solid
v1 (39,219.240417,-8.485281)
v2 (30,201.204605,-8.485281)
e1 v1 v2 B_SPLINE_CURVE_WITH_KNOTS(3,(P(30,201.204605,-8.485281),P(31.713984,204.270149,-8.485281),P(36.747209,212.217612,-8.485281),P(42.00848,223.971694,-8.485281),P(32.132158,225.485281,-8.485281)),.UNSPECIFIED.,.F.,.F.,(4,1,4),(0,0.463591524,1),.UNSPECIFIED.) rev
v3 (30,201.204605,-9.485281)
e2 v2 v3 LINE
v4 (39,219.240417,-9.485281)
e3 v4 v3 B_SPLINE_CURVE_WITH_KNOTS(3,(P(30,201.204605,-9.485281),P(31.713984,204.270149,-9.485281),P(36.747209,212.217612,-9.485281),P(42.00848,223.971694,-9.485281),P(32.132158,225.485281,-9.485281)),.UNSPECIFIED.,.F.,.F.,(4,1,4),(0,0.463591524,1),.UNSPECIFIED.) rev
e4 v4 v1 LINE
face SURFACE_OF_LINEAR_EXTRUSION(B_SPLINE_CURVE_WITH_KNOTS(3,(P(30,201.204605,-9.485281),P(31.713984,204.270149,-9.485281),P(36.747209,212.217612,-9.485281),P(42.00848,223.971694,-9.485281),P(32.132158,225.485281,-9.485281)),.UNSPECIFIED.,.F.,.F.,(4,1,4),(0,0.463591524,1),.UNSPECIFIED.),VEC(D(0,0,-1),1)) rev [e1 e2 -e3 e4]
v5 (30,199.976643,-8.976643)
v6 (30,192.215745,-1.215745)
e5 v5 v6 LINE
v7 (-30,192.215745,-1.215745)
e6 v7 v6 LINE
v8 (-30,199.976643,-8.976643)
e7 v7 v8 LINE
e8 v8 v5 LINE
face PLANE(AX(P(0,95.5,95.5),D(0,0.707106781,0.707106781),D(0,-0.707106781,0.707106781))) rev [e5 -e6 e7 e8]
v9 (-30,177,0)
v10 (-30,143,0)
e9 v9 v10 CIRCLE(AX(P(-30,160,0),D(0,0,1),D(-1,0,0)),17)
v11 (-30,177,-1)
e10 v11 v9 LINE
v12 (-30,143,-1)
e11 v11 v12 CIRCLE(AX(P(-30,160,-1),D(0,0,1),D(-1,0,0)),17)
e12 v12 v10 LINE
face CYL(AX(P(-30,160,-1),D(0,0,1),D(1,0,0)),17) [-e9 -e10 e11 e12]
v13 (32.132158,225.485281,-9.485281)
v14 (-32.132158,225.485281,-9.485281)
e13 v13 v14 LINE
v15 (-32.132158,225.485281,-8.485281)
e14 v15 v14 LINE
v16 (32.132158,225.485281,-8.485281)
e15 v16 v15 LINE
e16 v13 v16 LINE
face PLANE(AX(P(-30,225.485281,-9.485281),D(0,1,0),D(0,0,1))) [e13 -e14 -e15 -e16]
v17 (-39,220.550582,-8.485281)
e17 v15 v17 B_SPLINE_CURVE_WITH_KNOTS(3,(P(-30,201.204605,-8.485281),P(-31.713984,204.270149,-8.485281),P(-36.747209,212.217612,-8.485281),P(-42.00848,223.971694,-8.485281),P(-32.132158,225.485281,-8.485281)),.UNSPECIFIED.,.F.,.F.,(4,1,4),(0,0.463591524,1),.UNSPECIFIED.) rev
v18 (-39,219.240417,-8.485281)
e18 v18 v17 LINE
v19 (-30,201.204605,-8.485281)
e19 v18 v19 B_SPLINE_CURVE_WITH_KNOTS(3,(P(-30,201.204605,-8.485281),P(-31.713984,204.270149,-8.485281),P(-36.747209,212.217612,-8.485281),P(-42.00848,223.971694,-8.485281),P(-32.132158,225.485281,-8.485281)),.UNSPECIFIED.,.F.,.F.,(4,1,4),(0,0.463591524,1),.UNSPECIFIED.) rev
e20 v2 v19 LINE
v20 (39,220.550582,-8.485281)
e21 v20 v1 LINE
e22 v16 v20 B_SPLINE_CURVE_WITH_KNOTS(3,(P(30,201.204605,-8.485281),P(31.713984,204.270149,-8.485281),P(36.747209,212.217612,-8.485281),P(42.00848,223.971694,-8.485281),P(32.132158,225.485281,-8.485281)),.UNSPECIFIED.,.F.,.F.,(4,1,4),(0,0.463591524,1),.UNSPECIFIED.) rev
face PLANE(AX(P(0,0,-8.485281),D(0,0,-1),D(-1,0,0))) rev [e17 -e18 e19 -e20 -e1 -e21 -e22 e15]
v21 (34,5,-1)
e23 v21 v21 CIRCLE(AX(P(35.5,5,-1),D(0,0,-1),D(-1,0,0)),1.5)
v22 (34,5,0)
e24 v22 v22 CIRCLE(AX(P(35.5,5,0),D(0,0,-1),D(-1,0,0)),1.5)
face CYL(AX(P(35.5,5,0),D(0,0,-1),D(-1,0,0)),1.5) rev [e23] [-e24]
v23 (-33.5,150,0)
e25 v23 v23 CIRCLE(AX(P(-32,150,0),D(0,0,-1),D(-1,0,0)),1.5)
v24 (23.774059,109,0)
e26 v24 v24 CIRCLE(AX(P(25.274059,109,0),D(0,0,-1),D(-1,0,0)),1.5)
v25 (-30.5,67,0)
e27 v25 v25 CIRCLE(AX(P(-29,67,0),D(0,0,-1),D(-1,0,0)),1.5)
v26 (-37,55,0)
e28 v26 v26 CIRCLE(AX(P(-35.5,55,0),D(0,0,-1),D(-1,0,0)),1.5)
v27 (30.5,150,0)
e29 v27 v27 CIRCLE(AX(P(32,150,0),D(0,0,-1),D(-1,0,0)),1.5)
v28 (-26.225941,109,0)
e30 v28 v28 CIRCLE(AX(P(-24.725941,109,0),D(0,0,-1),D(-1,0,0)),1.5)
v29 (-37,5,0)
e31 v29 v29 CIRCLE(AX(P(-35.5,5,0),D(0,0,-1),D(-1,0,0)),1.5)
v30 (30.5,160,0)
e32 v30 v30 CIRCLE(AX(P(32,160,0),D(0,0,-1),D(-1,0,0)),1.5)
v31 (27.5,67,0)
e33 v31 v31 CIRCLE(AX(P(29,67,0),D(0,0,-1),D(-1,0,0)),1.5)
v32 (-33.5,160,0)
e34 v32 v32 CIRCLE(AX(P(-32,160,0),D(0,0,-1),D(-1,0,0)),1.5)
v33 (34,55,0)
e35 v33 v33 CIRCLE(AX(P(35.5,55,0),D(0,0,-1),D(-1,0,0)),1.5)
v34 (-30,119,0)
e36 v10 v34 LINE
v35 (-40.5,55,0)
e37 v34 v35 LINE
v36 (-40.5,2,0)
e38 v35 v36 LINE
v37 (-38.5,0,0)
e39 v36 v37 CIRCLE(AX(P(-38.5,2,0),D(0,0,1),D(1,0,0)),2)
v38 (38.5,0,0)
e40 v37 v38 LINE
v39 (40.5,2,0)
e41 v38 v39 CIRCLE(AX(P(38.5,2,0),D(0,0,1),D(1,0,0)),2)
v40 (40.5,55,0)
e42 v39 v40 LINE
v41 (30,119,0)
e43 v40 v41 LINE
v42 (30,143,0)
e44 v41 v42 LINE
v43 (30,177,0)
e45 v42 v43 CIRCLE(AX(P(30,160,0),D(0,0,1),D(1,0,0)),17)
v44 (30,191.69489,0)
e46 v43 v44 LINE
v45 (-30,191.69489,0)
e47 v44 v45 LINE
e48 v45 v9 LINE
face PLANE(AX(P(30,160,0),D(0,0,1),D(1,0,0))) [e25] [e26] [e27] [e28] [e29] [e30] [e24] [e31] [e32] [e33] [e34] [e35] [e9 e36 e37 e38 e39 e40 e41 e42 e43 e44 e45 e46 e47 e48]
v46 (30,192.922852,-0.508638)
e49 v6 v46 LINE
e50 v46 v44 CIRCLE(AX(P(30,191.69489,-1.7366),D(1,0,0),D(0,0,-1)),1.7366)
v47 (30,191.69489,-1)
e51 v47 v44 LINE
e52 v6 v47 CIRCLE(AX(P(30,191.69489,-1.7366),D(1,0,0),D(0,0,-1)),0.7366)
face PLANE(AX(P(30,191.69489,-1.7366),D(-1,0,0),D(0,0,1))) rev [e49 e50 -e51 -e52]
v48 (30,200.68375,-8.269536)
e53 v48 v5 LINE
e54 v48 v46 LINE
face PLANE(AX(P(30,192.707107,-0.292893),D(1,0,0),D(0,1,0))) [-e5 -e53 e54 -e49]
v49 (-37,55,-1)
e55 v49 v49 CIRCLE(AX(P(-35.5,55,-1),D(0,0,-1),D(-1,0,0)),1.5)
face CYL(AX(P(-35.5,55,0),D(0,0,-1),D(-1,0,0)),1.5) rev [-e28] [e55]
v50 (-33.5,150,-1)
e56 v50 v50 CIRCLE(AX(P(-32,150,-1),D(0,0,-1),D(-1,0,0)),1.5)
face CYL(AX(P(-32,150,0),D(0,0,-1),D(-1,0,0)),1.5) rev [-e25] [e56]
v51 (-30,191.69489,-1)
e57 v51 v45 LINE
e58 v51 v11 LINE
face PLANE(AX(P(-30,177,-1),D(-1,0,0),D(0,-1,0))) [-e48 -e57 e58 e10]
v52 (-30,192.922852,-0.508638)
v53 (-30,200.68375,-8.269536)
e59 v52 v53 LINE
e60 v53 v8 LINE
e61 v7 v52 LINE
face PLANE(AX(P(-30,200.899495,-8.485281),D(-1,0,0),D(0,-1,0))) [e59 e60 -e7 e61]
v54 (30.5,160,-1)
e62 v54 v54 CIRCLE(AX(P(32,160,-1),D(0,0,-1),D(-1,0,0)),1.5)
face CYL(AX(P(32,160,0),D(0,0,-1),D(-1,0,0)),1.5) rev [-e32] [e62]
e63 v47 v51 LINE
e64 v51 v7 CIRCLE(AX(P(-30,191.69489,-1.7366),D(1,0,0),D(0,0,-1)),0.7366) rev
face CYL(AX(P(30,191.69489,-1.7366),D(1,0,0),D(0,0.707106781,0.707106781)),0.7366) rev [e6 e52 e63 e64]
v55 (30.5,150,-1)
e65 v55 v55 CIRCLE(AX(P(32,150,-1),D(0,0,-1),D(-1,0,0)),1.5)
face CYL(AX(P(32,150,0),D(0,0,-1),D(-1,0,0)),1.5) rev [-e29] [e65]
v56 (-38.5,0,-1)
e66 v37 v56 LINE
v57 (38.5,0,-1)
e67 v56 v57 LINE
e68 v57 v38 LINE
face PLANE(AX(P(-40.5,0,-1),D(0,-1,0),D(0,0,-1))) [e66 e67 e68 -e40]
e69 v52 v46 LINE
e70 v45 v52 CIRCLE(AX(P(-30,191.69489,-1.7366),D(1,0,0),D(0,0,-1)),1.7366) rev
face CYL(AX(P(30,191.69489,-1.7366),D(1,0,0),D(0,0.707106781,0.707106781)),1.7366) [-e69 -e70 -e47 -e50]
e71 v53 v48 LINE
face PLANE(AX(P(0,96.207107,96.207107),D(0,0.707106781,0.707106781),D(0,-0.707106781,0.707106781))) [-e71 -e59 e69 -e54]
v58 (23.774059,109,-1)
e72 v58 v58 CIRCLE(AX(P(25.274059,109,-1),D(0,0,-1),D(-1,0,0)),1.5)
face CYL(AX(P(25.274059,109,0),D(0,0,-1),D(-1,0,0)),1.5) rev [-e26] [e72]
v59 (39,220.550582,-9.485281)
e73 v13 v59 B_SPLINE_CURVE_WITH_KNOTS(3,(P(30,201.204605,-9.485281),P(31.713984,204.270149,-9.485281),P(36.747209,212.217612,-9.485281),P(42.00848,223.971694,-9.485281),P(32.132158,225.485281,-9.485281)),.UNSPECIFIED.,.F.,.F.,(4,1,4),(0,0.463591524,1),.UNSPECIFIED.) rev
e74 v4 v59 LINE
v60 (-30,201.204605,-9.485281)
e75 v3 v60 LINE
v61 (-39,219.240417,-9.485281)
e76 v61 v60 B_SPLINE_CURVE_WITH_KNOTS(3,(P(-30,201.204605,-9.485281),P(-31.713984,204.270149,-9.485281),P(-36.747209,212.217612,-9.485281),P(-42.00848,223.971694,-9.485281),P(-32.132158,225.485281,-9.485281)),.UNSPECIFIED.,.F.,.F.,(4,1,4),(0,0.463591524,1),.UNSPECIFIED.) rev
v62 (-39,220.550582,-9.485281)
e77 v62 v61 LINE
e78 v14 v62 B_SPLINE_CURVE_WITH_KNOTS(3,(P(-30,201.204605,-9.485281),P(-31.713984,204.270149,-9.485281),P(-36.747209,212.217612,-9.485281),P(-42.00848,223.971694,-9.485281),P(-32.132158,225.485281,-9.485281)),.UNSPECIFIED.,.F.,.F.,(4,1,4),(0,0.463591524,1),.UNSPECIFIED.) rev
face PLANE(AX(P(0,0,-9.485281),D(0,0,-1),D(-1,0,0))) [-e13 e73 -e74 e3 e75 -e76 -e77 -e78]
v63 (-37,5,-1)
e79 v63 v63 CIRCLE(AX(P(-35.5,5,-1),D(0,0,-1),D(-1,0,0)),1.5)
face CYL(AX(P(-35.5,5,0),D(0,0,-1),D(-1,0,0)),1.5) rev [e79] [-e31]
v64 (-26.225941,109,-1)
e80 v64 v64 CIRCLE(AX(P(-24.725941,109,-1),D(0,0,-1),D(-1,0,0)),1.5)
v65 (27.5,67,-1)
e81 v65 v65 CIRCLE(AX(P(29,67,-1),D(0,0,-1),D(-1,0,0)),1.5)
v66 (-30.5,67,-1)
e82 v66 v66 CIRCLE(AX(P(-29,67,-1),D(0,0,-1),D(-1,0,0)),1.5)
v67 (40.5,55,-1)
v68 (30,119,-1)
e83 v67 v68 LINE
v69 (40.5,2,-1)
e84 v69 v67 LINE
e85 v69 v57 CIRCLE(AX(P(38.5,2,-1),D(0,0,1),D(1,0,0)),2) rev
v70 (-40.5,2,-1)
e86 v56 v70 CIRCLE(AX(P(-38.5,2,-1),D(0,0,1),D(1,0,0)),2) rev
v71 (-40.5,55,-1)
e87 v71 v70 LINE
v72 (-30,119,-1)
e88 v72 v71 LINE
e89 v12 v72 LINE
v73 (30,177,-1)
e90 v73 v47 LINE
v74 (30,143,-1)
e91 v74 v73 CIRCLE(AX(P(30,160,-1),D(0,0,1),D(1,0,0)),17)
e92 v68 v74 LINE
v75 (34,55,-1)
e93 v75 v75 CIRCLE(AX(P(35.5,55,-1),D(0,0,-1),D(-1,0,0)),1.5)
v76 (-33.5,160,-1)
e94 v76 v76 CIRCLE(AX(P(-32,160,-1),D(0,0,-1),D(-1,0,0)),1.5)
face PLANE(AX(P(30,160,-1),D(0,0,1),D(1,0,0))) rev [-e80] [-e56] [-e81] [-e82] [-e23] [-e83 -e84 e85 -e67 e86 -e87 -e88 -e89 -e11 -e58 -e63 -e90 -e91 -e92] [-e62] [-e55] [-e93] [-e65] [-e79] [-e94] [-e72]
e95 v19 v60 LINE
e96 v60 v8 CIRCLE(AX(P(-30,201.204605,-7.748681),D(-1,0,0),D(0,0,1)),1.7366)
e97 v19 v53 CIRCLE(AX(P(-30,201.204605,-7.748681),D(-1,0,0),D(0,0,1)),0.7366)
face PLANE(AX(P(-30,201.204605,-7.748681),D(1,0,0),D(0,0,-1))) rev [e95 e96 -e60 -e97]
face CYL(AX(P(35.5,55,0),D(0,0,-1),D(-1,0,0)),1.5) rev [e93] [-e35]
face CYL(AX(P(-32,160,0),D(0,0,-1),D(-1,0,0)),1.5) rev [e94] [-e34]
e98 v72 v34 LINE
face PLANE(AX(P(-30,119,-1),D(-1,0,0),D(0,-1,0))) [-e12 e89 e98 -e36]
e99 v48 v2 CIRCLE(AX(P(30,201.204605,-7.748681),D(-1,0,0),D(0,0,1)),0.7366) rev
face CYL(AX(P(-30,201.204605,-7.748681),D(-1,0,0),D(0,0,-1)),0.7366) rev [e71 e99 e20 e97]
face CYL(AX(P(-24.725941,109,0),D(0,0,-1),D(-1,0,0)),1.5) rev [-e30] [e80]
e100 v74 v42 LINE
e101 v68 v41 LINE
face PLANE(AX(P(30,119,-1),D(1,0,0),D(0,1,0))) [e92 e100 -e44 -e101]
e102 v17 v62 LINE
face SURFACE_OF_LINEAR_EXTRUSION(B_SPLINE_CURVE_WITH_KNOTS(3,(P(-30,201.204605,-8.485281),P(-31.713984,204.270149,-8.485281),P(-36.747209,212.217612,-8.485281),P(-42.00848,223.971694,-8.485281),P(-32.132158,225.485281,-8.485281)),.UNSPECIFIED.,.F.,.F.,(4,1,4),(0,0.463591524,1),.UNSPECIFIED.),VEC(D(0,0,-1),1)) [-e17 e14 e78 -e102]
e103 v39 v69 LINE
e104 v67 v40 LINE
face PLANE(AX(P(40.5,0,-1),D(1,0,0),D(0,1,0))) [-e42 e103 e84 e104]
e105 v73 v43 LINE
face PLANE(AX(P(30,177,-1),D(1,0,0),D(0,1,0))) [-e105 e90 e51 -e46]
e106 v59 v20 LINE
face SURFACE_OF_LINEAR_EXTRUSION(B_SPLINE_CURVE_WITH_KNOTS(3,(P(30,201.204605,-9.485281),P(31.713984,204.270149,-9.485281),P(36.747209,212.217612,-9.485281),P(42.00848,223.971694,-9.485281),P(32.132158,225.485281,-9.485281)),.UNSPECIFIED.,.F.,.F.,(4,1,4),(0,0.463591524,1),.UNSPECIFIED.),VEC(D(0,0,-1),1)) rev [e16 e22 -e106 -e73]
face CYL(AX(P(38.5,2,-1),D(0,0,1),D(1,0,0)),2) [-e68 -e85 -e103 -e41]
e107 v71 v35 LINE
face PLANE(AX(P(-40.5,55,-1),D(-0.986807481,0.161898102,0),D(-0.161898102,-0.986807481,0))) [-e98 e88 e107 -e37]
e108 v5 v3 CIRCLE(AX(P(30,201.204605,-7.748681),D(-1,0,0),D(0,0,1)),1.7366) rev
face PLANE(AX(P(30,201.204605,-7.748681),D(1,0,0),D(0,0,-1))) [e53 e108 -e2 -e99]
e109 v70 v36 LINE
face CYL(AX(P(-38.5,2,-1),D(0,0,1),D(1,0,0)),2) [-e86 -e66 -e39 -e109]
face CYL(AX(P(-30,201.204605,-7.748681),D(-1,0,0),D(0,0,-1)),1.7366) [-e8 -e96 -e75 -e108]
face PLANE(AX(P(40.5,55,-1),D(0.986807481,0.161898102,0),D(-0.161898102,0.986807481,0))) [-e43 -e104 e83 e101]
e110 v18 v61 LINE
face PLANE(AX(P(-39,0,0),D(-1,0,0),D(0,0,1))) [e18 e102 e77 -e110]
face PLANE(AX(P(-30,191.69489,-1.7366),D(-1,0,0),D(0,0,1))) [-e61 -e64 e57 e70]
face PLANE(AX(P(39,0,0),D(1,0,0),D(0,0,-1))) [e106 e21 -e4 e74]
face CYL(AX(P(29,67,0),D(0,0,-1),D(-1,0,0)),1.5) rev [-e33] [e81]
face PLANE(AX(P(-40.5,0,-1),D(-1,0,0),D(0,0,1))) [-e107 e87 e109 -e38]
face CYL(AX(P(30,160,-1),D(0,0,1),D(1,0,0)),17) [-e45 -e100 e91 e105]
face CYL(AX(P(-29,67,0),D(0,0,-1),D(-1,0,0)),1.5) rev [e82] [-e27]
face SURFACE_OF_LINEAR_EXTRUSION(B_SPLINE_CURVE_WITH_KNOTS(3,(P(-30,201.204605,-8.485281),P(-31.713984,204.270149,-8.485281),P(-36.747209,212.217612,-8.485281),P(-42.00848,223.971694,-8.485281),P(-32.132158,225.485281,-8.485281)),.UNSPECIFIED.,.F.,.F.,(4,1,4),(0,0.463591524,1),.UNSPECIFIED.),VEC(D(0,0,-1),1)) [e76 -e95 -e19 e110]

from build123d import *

# Parameters (mm, degrees)
BASE_FLANGE1_DEPTH           = 1
EDGE_FLANGE1_STRIP_CUT_DEPTH = 60
EDGE_FLANGE1_DEPTH           = 60
EDGE_FLANGE2_STRIP_CUT_DEPTH = 60
EDGE_FLANGE2_DEPTH           = 60
SKETCH14_W                   = 1
SKETCH14_H                   = 24.280676727
BOSS_EXTRUDE1_DEPTH          = 9
SKETCH15_W                   = 1
SKETCH15_H                   = 24.280676727
BOSS_EXTRUDE2_DEPTH          = 9
CUT_EXTRUDE1_START           = -1
CUT_EXTRUDE1_DEPTH           = 1
FILLET2_R                    = 2
SKETCH17_R                   = 1.5
CUT_EXTRUDE2_DEPTH           = 231.487770095
SKETCH18_R                   = 1.5
CUT_EXTRUDE3_DEPTH           = 231.487770095
SKETCH19_R                   = 1.5
CUT_EXTRUDE4_DEPTH           = 231.487770095


# Read off the part's stored shape, not the designer's step: Cut-Extrude1
# Sheet-metal steps are written as plain solids
with BuildPart() as part:
    # Sketch1 → Base-Flange1 (new body)
    with BuildSketch(Plane.XY):
        with BuildLine():
            Line((-40.5, 0), (40.5, 0))
            Line((40.5, 0), (40.5, 55))
            Line((40.5, 55), (30, 119))
            Line((30, 119), (30, 143))
            ThreePointArc((30, 143), (47, 160), (30, 177))
            Line((30, 177), (30, 192))
            Line((30, 192), (-30, 192))
            Line((-30, 192), (-30, 177))
            ThreePointArc((-30, 177), (-47, 160), (-30, 143))
            Line((-30, 143), (-30, 119))
            Line((-30, 119), (-40.5, 55))
            Line((-40.5, 55), (-40.5, 0))
        make_face()
    extrude(amount=-BASE_FLANGE1_DEPTH)

    # Edge-Flange1 strip (across the edge) → Edge-Flange1 strip cut (cut)
    with BuildSketch(Plane(origin=(-30, 192, -1), x_dir=(0, -0.7071067811865438, -0.7071067811865512), z_dir=(1, 0, 0))):
        Polygon((-4.361498471, 2.947284909), (-0.491361636, -0.922851926), (0.215745145, -0.215745145), (-3.65439169, 3.65439169), align=None)
    extrude(amount=EDGE_FLANGE1_STRIP_CUT_DEPTH, mode=Mode.SUBTRACT)

    # Edge-Flange1 section (across the edge) → Edge-Flange1 (add)
    with BuildSketch(Plane(origin=(-30, 192, -1), x_dir=(0, -0.7071067811865438, -0.7071067811865512), z_dir=(1, 0, 0))):
        with BuildLine():
            Line((-1, 0.30510971), (-1, 11.585786438))
            Line((-1, 11.585786438), (0, 11.585786438))
            Line((0, 11.585786438), (0, 0.30510971))
            ThreePointArc((0, 0.30510971), (0.056070336, 0.023225094), (0.215745145, -0.215745145))
            Line((0.215745145, -0.215745145), (-0.491361636, -0.922851926))
            ThreePointArc((-0.491361636, -0.922851926), (-0.867809196, -0.359458339), (-1, 0.30510971))
        make_face()
    extrude(amount=EDGE_FLANGE1_DEPTH)

    # Edge-Flange2 strip (across the edge) → Edge-Flange2 strip cut (cut)
    with BuildSketch(Plane(origin=(30, 200.899494937, -8.485281374), x_dir=(0, 0, 1), z_dir=(-1, 0, 0))):
        Polygon((-4.361498471, 2.947284909), (-0.491361636, -0.922851926), (0.215745145, -0.215745145), (-3.65439169, 3.65439169), align=None)
    extrude(amount=EDGE_FLANGE2_STRIP_CUT_DEPTH, mode=Mode.SUBTRACT)

    # Edge-Flange2 section (across the edge) → Edge-Flange2 (add)
    with BuildSketch(Plane(origin=(30, 200.899494937, -8.485281374), x_dir=(0, 0, 1), z_dir=(-1, 0, 0))):
        with BuildLine():
            Line((-1, 0.30510971), (-1, 24.585786438))
            Line((-1, 24.585786438), (0, 24.585786438))
            Line((0, 24.585786438), (0, 0.30510971))
            ThreePointArc((0, 0.30510971), (0.056070336, 0.023225094), (0.215745145, -0.215745145))
            Line((0.215745145, -0.215745145), (-0.491361636, -0.922851926))
            ThreePointArc((-0.491361636, -0.922851926), (-0.867809196, -0.359458339), (-1, 0.30510971))
        make_face()
    extrude(amount=EDGE_FLANGE2_DEPTH)

    # Sketch14 → Boss-Extrude1 (add)
    with BuildSketch(Plane(origin=(30, 0, 0), x_dir=(0, 0, -1), z_dir=(1, 0, 0))):
        with Locations((8.985281374, 213.344943011)):
            Rectangle(SKETCH14_W, SKETCH14_H)
    extrude(amount=BOSS_EXTRUDE1_DEPTH)

    # Sketch15 → Boss-Extrude2 (add)
    with BuildSketch(Plane.ZY.offset(30)):
        with Locations((-8.985281374, 213.344943011)):
            Rectangle(SKETCH15_W, SKETCH15_H)
    extrude(amount=BOSS_EXTRUDE2_DEPTH)

    # Cut-Extrude1 outline → Cut-Extrude1 (cut)
    with BuildSketch(Plane(origin=(0, 0, -9.485281374), x_dir=(-1, 0, 0), z_dir=(0, 0, -1)).offset(CUT_EXTRUDE1_START)):
        with BuildLine():
            Line((39, 201.204604647), (39, 219.240417061))
            add(Edge.make_bspline(
                [(30, 201.204604647), (31.71398357, 204.270148777), (35.194685688, 209.766177292), (38.784446875, 217.082662856), (39, 219.240417061)],
                knots=[0, 0, 0, 0, 0.463591524, 0.691545034, 0.691545034, 0.691545034, 0.691545034], degree=3))
            Line((30, 201.204604647), (39, 201.204604647))
        make_face()
        with BuildLine():
            add(Edge.make_bspline(
                [(39, 220.550582239), (38.73699137, 222.877809464), (36.937902842, 224.748781209), (32.132158029, 225.485281374)],
                knots=[0.73898762, 0.73898762, 0.73898762, 0.73898762, 1, 1, 1, 1], degree=3))
            Line((39, 220.550582239), (39, 225.485281374))
            Line((39, 225.485281374), (32.132158029, 225.485281374))
        make_face()
    cut_extrude1 = extrude(amount=CUT_EXTRUDE1_DEPTH, mode=Mode.SUBTRACT)

    # Mirror1: Cut-Extrude1 across plane
    add(cut_extrude1.mirror(Plane(origin=(0, 0, 0), x_dir=(0, 0, 1), z_dir=(1, 0, 0))), mode=Mode.SUBTRACT)

    # Fillet2
    fillet2_edges = [part.edges().sort_by_distance(p)[0] for p in [
        (40.5, 0, -0.5),
        (-40.5, 0, -0.5),
    ]]
    fillet(fillet2_edges, radius=FILLET2_R)

    # Sketch17 → Cut-Extrude2 (cut, through all)
    with BuildSketch(Plane(origin=(0, 0, -1), x_dir=(-1, 0, 0), z_dir=(0, 0, -1))):
        with Locations((-35.5, 5)):
            Circle(SKETCH17_R)
        with Locations((35.5, 5)):
            Circle(SKETCH17_R)
        with Locations((-35.5, 55)):
            Circle(SKETCH17_R)
        with Locations((35.5, 55)):
            Circle(SKETCH17_R)
    extrude(amount=-CUT_EXTRUDE2_DEPTH, mode=Mode.SUBTRACT)

    # Sketch18 → Cut-Extrude3 (cut, through all)
    with BuildSketch(Plane(origin=(0, 0, -1), x_dir=(-1, 0, 0), z_dir=(0, 0, -1))):
        with Locations((-29, 67)):
            Circle(SKETCH18_R)
        with Locations((29, 67)):
            Circle(SKETCH18_R)
        with Locations((-25.274058899, 109)):
            Circle(SKETCH18_R)
        with Locations((24.725941101, 109)):
            Circle(SKETCH18_R)
    extrude(amount=-CUT_EXTRUDE3_DEPTH, mode=Mode.SUBTRACT)

    # Sketch19 → Cut-Extrude4 (cut, through all)
    with BuildSketch(Plane(origin=(0, 0, -1), x_dir=(-1, 0, 0), z_dir=(0, 0, -1))):
        with Locations((-32, 160)):
            Circle(SKETCH19_R)
        with Locations((32, 160)):
            Circle(SKETCH19_R)
        with Locations((-32, 150)):
            Circle(SKETCH19_R)
        with Locations((32, 150)):
            Circle(SKETCH19_R)
    extrude(amount=-CUT_EXTRUDE4_DEPTH, mode=Mode.SUBTRACT)


solid = part.part
